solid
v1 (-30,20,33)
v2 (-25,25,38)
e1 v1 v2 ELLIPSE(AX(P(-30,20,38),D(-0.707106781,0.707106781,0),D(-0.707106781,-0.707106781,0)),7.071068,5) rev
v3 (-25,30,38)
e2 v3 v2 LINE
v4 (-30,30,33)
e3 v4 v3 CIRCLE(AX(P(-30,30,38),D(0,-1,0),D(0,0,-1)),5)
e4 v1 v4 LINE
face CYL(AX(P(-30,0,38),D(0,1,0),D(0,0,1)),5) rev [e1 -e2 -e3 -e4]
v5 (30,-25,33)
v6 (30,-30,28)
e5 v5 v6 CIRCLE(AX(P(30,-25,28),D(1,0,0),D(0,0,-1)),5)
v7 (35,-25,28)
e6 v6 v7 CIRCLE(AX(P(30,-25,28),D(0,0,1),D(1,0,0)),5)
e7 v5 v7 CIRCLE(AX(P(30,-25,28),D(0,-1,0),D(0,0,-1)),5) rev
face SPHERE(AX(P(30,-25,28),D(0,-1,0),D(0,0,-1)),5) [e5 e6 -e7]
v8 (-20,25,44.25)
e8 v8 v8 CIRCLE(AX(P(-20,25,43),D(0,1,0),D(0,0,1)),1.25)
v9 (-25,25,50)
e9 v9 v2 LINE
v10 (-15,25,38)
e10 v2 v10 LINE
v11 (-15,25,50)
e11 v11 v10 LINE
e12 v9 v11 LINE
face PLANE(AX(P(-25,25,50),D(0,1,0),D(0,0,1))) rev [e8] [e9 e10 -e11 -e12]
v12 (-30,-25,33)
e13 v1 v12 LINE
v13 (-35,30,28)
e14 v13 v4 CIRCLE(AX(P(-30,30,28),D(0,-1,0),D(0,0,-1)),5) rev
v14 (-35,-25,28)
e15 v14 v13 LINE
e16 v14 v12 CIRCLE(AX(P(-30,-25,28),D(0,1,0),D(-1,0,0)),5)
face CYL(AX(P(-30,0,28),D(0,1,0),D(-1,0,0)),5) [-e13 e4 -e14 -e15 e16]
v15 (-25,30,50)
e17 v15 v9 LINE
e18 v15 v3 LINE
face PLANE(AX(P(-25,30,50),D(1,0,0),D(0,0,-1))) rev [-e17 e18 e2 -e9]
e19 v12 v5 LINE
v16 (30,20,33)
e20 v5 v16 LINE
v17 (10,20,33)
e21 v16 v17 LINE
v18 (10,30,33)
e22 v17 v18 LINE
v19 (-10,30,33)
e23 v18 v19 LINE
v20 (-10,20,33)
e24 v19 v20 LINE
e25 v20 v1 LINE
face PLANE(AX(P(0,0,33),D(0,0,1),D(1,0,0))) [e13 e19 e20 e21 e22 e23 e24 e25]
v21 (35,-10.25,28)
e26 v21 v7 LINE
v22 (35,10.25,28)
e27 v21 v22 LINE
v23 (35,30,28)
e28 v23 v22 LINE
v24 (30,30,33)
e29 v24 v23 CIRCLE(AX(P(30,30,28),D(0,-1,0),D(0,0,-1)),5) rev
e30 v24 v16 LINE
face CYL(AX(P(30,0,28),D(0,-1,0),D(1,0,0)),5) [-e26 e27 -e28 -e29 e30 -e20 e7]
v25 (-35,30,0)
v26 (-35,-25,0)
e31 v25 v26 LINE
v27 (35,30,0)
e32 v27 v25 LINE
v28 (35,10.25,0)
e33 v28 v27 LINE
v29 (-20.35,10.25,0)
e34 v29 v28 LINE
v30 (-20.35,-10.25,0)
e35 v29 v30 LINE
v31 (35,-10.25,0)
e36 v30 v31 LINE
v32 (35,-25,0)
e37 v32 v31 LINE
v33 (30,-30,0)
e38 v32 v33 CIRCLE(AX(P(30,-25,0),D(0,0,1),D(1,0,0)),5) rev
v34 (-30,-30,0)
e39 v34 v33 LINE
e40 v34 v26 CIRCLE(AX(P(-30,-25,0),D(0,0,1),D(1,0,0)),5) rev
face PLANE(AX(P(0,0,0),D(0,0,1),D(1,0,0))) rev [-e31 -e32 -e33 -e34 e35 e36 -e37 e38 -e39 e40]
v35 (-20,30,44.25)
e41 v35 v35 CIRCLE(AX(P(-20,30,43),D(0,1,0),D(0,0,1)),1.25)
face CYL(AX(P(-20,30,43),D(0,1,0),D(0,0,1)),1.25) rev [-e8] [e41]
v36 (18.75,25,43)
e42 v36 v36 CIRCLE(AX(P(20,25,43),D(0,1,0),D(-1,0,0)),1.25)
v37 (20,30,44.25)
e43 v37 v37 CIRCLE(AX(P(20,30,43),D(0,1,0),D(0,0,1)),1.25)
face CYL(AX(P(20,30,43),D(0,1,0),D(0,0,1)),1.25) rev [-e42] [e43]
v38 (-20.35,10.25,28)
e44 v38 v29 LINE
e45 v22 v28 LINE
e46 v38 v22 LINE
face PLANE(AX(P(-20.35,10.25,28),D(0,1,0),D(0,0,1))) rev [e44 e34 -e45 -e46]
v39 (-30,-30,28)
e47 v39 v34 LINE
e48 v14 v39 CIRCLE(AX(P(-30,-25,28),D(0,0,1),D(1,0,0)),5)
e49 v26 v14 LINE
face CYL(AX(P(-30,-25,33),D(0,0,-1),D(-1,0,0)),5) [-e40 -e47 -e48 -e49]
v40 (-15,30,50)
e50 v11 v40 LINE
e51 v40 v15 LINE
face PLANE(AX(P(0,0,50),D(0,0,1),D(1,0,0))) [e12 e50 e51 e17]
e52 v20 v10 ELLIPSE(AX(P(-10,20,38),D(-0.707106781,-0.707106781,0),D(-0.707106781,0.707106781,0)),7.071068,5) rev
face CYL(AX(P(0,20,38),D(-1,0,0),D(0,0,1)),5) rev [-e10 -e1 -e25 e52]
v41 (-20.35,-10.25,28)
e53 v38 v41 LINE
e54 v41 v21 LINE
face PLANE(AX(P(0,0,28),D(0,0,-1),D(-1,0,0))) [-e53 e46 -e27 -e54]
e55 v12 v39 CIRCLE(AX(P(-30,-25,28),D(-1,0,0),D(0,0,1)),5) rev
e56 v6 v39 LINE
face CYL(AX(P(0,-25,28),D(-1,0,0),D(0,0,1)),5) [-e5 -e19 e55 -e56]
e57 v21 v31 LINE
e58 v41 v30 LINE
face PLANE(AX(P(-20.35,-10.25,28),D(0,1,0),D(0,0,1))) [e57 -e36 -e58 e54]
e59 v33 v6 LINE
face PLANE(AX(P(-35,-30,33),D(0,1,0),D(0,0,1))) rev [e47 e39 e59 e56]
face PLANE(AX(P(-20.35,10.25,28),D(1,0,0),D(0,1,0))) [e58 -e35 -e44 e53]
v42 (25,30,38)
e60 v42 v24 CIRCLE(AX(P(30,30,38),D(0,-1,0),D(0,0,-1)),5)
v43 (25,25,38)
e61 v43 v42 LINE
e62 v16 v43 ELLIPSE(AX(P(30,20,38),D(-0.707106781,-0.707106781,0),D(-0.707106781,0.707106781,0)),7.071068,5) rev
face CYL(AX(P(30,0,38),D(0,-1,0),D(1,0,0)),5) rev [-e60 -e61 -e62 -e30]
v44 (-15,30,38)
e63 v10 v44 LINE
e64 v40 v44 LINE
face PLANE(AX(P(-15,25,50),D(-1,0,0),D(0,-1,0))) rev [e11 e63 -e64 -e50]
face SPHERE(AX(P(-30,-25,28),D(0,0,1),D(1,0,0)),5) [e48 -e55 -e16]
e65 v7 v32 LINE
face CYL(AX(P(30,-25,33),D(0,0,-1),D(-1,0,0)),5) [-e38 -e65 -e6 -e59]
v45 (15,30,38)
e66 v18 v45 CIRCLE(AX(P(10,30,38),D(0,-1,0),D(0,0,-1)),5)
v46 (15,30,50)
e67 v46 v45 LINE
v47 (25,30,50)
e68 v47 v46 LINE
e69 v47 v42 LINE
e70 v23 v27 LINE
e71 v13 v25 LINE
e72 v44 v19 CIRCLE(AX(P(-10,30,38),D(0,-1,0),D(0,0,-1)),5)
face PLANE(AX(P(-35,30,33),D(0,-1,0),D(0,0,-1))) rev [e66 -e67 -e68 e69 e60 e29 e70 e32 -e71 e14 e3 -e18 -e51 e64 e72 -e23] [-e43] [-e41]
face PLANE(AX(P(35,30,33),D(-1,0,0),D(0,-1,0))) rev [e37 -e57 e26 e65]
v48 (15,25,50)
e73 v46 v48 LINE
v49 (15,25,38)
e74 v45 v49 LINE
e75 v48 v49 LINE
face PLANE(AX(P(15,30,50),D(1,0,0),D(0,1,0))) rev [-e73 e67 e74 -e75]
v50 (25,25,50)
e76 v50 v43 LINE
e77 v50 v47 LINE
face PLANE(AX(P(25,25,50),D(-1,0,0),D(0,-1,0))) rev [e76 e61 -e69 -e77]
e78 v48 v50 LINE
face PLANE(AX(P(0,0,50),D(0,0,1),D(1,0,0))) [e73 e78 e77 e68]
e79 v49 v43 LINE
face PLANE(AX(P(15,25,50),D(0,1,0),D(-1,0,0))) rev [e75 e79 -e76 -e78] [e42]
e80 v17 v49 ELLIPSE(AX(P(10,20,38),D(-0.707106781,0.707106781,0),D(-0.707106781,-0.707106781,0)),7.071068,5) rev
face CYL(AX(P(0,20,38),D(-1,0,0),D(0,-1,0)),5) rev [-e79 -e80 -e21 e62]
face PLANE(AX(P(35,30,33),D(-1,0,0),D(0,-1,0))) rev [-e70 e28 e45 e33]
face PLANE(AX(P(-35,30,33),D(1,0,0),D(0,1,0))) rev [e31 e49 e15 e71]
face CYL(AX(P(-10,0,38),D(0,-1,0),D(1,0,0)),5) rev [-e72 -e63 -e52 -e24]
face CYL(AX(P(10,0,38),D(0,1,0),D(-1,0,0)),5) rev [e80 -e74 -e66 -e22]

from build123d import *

# Parameters (mm, degrees)
SKETCH_2_W          = 70
SKETCH_2_H          = 60
EXTRUDE_2_DEPTH     = 33
SKETCH_3_W          = 40.7
SKETCH_3_H          = 20.5
CUT_EXTRUDE_1_DEPTH = 28
SKETCH_4_W          = 14.65
SKETCH_4_H          = 20.5
EXTRUDE_3_DEPTH     = 28
SKETCH_5_W          = 14.65
SKETCH_5_H          = 20.5
CUT_EXTRUDE_4_DEPTH = 28
SKETCH_8_W          = 10
SKETCH_8_H          = 5
EXTRUDE_5_DEPTH     = 50
M3X0_5_1_D          = 2.5
FILLET_1_R          = 5
FILLET_2_R          = 5
FILLET_3_R          = 5


# Some blends are built 0.0001 mm under size
with BuildPart() as part:
    # ｽｹｯﾁ2 → ﾎﾞｽ - 押し出し2 (new body)
    with BuildSketch(Plane.XY):
        Rectangle(SKETCH_2_W, SKETCH_2_H)
    extrude(amount=EXTRUDE_2_DEPTH)

    # ｽｹｯﾁ3 → ｶｯﾄ - 押し出し1 (cut)
    with BuildSketch(Plane.XY):
        Rectangle(SKETCH_3_W, SKETCH_3_H)
    extrude(amount=CUT_EXTRUDE_1_DEPTH, mode=Mode.SUBTRACT)

    # ｽｹｯﾁ4 → ﾎﾞｽ - 押し出し3 (add)
    with BuildSketch(Plane.XY):
        with Locations((27.675, 0)):
            Rectangle(SKETCH_4_W, SKETCH_4_H)
    extrude(amount=EXTRUDE_3_DEPTH)

    # ｽｹｯﾁ5 → ｶｯﾄ - 押し出し4 (cut)
    with BuildSketch(Plane.XY):
        with Locations((27.675, 0)):
            Rectangle(SKETCH_5_W, SKETCH_5_H)
    extrude(amount=CUT_EXTRUDE_4_DEPTH, mode=Mode.SUBTRACT)

    # ｽｹｯﾁ8 → ﾎﾞｽ - 押し出し5 (add)
    with BuildSketch(Plane.XY):
        with Locations((-20, 27.5)):
            Rectangle(SKETCH_8_W, SKETCH_8_H)
        with Locations((20, 27.5)):
            Rectangle(SKETCH_8_W, SKETCH_8_H)
    extrude(amount=EXTRUDE_5_DEPTH)

    # M3x0.5 ねじ穴1 (through all)
    with Locations(Plane(origin=(0, 30, 0), x_dir=(1, 0, 0), z_dir=(0, 1, 0))):
        with Locations((-20, -43), (20, -43)):
            Hole(M3X0_5_1_D / 2)

    # ﾌｨﾚｯﾄ1
    fillet_1_edges = [part.edges().sort_by_distance(p)[0] for p in [
        (-15, 27.5, 33),
        (-20, 25, 33),
        (-25, 27.5, 33),
        (20, 25, 33),
        (15, 27.5, 33),
        (25, 27.5, 33),
    ]]
    fillet(fillet_1_edges, radius=FILLET_1_R)

    # ﾌｨﾚｯﾄ2
    fillet_2_edges = [part.edges().sort_by_distance(p)[0] for p in [
        (35, 0, 33),
        (35, -30, 16.5),
        (0, -30, 33),
        (-35, 0, 33),
    ]]
    fillet(fillet_2_edges, radius=FILLET_2_R - 0.0001)  # a hair under: the kernel refuses the full size

    # ﾌｨﾚｯﾄ3
    # the kernel refuses this fillet: 5 mm, written as the material it takes off along each edge
    with BuildSketch(Plane(origin=(-30, -25, 33), x_dir=(-1, 0, 0), z_dir=(0, 1, 0))) as fillet_3_piece_1:
        with BuildLine():
            CenterArc((0.0001, -4.9999), 4.9999, 0, 90)
            Line((5, -4.9999), (5, 0))
            Line((5, 0), (0.0001, 0))
        make_face()
    revolve(axis=Axis((-30, -25, 33), (0, 0, 1)), revolution_arc=90, mode=Mode.SUBTRACT)
    with BuildSketch(Plane(origin=(-35, -30, -12.5), x_dir=(0, 1, 0), z_dir=(0, 0, 1))) as fillet_3_piece_2:
        with BuildLine():
            CenterArc((FILLET_3_R, -FILLET_3_R), FILLET_3_R, 90, 90)
            Line((0, -FILLET_3_R), (0, 0))
            Line((0, 0), (FILLET_3_R, 0))
        make_face()
    extrude(amount=45.5, mode=Mode.SUBTRACT)


solid = part.part
